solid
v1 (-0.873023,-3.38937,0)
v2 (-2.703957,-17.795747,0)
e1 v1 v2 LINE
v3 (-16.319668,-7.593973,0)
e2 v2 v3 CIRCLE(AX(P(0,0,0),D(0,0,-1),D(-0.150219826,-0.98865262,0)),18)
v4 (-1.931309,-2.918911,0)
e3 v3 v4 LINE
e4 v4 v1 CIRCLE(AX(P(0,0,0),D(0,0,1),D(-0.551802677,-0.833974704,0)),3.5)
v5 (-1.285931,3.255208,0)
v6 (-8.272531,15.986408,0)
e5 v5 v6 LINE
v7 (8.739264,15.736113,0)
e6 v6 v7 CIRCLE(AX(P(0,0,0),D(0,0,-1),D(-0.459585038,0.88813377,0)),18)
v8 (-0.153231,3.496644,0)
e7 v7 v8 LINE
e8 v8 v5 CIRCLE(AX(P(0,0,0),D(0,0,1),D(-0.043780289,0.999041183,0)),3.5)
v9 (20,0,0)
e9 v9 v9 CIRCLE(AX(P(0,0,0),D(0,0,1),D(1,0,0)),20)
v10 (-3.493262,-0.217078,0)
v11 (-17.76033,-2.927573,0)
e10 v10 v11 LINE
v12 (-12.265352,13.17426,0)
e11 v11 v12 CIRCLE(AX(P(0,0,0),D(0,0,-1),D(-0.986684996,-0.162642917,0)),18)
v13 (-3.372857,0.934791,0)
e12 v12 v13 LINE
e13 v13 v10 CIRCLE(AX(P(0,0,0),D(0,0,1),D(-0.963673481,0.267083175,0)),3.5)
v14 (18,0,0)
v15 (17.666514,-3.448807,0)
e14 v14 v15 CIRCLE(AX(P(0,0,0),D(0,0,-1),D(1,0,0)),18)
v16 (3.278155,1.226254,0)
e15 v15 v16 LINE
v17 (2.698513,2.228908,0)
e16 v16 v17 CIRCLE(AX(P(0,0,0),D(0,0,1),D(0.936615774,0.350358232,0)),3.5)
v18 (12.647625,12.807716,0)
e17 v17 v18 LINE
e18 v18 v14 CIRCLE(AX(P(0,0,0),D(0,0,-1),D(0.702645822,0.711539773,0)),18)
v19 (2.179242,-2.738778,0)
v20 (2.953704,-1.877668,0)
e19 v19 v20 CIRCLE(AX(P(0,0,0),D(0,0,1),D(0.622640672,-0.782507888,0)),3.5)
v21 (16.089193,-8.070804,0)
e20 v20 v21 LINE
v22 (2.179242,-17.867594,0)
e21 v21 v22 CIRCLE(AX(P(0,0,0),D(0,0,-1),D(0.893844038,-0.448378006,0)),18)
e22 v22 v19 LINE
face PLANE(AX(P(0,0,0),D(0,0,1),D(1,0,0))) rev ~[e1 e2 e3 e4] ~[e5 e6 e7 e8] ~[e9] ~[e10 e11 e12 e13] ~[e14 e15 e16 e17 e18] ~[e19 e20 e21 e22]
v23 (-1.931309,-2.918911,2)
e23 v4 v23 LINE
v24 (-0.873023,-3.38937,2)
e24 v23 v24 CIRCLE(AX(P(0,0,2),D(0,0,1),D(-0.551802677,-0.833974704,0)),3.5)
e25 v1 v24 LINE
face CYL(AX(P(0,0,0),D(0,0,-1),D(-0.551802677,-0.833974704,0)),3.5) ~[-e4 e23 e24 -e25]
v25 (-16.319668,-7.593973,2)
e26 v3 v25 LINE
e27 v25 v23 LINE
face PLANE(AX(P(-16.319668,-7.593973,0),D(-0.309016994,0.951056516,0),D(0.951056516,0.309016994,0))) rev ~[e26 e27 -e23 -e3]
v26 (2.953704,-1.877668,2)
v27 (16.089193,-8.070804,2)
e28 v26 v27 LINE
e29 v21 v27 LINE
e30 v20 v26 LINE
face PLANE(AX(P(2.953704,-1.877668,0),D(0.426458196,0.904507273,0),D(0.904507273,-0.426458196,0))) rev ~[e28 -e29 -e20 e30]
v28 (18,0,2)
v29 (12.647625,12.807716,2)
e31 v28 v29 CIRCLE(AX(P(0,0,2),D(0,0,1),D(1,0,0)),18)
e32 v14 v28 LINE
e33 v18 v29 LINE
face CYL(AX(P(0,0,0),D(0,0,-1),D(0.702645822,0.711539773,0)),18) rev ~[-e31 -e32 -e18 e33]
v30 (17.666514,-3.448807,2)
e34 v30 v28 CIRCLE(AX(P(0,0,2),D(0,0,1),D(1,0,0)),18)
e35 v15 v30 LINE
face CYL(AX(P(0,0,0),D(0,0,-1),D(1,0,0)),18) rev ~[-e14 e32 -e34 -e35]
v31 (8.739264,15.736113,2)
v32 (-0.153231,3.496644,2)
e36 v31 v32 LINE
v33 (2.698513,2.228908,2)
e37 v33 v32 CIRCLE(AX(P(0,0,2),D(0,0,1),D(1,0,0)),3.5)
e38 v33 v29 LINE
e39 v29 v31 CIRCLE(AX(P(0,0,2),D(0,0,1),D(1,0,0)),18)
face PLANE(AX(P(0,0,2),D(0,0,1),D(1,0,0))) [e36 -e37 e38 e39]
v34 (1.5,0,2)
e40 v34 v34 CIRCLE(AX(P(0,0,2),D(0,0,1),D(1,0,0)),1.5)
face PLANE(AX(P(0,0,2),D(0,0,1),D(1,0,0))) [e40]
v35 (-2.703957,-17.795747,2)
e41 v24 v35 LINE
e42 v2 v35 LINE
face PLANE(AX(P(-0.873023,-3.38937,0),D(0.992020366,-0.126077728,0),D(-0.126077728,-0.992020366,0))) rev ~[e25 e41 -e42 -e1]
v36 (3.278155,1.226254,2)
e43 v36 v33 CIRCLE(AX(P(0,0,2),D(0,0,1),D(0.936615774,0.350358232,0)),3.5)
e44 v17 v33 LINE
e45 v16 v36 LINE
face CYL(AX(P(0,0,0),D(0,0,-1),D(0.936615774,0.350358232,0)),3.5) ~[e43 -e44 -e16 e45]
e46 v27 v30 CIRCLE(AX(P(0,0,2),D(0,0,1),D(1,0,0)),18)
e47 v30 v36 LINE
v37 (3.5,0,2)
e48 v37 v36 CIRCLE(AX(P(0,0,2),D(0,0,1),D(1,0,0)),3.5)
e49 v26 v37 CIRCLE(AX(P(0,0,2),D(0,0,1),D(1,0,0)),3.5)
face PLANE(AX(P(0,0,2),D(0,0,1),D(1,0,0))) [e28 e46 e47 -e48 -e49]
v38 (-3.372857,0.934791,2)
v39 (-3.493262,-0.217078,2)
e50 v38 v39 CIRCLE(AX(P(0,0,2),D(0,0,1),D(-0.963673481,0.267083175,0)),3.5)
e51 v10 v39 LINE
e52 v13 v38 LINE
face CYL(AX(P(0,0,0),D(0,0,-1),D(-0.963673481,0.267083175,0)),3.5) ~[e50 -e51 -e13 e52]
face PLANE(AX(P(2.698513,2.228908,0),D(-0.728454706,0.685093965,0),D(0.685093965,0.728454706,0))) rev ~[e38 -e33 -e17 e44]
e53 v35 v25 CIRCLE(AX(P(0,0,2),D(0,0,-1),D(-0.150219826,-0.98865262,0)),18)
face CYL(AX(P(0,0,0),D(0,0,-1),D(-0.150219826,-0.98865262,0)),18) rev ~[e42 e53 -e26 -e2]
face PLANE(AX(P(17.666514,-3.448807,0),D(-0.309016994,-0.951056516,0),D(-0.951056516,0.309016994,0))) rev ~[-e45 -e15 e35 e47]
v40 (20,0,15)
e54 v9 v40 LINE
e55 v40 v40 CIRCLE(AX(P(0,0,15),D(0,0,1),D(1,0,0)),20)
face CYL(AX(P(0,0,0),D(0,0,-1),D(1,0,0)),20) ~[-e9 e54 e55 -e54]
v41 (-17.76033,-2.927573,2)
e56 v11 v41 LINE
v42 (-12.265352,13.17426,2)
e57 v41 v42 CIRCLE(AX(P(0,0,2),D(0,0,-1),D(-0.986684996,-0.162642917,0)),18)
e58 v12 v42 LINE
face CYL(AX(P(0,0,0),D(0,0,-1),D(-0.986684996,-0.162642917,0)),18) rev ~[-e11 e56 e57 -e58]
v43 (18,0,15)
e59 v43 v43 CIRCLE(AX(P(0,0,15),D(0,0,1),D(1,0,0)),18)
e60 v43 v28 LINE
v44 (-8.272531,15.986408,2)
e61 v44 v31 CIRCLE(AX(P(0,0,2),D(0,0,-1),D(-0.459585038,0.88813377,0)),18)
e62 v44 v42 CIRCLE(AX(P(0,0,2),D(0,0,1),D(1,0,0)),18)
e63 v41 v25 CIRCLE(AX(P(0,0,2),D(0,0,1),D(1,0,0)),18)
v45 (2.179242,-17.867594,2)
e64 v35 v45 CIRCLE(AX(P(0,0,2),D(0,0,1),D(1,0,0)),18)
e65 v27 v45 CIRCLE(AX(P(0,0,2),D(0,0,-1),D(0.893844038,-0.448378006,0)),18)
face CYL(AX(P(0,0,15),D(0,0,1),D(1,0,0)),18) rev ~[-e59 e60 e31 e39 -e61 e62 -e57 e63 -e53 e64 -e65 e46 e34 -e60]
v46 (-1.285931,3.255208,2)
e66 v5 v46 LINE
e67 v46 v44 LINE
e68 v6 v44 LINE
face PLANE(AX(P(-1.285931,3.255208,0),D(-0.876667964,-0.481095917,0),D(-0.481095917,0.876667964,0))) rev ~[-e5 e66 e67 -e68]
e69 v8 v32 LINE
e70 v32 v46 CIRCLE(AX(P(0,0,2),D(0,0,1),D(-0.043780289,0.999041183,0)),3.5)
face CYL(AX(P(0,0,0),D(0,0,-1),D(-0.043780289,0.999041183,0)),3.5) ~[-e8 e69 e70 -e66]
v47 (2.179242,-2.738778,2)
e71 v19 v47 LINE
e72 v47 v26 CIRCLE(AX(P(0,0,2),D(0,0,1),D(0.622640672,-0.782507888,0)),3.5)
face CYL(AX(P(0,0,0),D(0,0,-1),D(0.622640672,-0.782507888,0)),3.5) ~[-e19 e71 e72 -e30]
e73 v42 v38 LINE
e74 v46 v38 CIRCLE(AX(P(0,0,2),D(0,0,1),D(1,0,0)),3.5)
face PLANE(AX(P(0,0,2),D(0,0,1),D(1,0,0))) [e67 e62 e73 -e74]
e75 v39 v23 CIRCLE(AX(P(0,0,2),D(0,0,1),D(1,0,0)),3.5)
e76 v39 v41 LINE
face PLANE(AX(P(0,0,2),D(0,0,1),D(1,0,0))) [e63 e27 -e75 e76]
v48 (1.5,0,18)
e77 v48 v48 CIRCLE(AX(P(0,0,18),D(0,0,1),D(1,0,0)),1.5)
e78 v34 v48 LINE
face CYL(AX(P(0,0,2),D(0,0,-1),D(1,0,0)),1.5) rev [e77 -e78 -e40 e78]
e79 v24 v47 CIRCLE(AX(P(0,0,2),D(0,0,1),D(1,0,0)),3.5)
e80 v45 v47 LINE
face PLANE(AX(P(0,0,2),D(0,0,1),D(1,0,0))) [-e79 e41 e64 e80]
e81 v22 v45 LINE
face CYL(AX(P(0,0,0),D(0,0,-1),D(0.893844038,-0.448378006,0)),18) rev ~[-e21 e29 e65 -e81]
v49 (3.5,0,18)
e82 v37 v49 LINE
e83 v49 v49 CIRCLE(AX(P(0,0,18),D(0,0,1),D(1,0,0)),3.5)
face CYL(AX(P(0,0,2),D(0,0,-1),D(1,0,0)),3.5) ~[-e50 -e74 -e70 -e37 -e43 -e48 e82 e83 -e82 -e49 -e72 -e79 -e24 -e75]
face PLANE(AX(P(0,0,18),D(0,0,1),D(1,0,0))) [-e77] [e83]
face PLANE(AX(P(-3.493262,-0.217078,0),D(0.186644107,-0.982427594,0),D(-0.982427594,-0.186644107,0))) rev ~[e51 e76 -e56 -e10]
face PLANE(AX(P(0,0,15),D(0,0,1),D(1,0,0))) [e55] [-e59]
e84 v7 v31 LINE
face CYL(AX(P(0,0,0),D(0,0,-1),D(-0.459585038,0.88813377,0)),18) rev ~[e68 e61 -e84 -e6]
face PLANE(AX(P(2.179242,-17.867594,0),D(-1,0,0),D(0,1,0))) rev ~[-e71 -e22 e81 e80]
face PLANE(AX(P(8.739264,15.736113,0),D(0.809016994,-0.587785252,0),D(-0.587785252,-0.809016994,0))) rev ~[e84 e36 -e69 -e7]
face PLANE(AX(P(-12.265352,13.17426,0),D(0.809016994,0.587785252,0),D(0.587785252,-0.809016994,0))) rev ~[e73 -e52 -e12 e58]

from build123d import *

# Parameters (mm, degrees)
F0_R     = 20
F1_DEPTH = 15
F2_R     = 18
F3_DEPTH = 13
F4_R     = 3.5
F4_R_2   = 1.5
F5_DEPTH = 16
F7_DEPTH = 2


with BuildPart() as f1:
    # F0 (on Top) → F1 (new body)
    with BuildSketch(Plane.XY):
        Circle(F0_R)
    extrude(amount=F1_DEPTH)

    # F2 (on face) → F3 (cut)
    with BuildSketch(Plane.XY.offset(15)):
        Circle(F2_R)
    extrude(amount=-F3_DEPTH, mode=Mode.SUBTRACT)

    # F4 (on face) → F5 (join)
    with BuildSketch(Plane.XY.offset(2)):
        Circle(F4_R)
        Circle(F4_R_2, mode=Mode.SUBTRACT)
    extrude(amount=F5_DEPTH)

    # F6 (on face) → F7 (cut)
    with BuildSketch(Plane(origin=(0, 0, 0), x_dir=(1, 0, 0), z_dir=(0, 0, -1))):
        with BuildLine():
            ThreePointArc((-1.9313093683, 2.9189114622), (-1.42176068, 3.1982177175), (-0.8730234102, 3.3893701664))
            Line((-0.8730234102, 3.3893701664), (-2.7039568663, 17.7957471679))
            ThreePointArc((-2.7039568663, 17.7957471679), (-10.7932215062, 14.4050813784), (-16.3196684485, 7.5939727238))
            Line((-16.3196684485, 7.5939727238), (-1.9313093683, 2.9189114622))
        make_face()
        with BuildLine():
            ThreePointArc((-3.3728571828, -0.9347911128), (-3.4810340129, -0.3638711329), (-3.4932616532, 0.2170783785))
            Line((-3.4932616532, 0.2170783785), (-17.7603299302, 2.927572505))
            ThreePointArc((-17.7603299302, 2.927572505), (-17.0353353821, -5.813548694), (-12.2653521367, -13.1742603953))
            Line((-12.2653521367, -13.1742603953), (-3.3728571828, -0.9347911128))
        make_face()
        with BuildLine():
            ThreePointArc((-0.1532310099, -3.4966441423), (-0.7296366559, -3.4231024452), (-1.285931023, -3.2552083503))
            Line((-1.285931023, -3.2552083503), (-8.2725306819, -15.9864078553))
            ThreePointArc((-8.2725306819, -15.9864078553), (0.2648052303, -17.9980520665), (8.7392639441, -15.7361134247))
            Line((8.7392639441, -15.7361134247), (-0.1532310099, -3.4966441423))
        make_face()
        with BuildLine():
            ThreePointArc((18, 0), (17.9164345956, 1.7324466465), (17.6665142908, 3.448807448))
            Line((17.6665142908, 3.448807448), (3.2781552106, -1.2262538137))
            ThreePointArc((3.2781552106, -1.2262538137), (3.0300937601, -1.7517225252), (2.6985125738, -2.2289077794))
            Line((2.6985125738, -2.2289077794), (12.6476247957, -12.8077159176))
            ThreePointArc((12.6476247957, -12.8077159176), (16.6080890882, -6.9405602683), (18, 0))
        make_face()
        with BuildLine():
            Line((2.1792423504, 17.8675936482), (2.1792423504, 2.7387776066))
            ThreePointArc((2.1792423504, 2.7387776066), (2.6023375887, 2.3404783858), (2.9537035127, 1.8776675848))
            Line((2.9537035127, 1.8776675848), (16.0891926827, 8.0708041))
            ThreePointArc((16.0891926827, 8.0708041), (10.3647576432, 14.7163785966), (2.1792423504, 17.8675936482))
        make_face()
    extrude(amount=-F7_DEPTH, mode=Mode.SUBTRACT)


solid = f1.part
